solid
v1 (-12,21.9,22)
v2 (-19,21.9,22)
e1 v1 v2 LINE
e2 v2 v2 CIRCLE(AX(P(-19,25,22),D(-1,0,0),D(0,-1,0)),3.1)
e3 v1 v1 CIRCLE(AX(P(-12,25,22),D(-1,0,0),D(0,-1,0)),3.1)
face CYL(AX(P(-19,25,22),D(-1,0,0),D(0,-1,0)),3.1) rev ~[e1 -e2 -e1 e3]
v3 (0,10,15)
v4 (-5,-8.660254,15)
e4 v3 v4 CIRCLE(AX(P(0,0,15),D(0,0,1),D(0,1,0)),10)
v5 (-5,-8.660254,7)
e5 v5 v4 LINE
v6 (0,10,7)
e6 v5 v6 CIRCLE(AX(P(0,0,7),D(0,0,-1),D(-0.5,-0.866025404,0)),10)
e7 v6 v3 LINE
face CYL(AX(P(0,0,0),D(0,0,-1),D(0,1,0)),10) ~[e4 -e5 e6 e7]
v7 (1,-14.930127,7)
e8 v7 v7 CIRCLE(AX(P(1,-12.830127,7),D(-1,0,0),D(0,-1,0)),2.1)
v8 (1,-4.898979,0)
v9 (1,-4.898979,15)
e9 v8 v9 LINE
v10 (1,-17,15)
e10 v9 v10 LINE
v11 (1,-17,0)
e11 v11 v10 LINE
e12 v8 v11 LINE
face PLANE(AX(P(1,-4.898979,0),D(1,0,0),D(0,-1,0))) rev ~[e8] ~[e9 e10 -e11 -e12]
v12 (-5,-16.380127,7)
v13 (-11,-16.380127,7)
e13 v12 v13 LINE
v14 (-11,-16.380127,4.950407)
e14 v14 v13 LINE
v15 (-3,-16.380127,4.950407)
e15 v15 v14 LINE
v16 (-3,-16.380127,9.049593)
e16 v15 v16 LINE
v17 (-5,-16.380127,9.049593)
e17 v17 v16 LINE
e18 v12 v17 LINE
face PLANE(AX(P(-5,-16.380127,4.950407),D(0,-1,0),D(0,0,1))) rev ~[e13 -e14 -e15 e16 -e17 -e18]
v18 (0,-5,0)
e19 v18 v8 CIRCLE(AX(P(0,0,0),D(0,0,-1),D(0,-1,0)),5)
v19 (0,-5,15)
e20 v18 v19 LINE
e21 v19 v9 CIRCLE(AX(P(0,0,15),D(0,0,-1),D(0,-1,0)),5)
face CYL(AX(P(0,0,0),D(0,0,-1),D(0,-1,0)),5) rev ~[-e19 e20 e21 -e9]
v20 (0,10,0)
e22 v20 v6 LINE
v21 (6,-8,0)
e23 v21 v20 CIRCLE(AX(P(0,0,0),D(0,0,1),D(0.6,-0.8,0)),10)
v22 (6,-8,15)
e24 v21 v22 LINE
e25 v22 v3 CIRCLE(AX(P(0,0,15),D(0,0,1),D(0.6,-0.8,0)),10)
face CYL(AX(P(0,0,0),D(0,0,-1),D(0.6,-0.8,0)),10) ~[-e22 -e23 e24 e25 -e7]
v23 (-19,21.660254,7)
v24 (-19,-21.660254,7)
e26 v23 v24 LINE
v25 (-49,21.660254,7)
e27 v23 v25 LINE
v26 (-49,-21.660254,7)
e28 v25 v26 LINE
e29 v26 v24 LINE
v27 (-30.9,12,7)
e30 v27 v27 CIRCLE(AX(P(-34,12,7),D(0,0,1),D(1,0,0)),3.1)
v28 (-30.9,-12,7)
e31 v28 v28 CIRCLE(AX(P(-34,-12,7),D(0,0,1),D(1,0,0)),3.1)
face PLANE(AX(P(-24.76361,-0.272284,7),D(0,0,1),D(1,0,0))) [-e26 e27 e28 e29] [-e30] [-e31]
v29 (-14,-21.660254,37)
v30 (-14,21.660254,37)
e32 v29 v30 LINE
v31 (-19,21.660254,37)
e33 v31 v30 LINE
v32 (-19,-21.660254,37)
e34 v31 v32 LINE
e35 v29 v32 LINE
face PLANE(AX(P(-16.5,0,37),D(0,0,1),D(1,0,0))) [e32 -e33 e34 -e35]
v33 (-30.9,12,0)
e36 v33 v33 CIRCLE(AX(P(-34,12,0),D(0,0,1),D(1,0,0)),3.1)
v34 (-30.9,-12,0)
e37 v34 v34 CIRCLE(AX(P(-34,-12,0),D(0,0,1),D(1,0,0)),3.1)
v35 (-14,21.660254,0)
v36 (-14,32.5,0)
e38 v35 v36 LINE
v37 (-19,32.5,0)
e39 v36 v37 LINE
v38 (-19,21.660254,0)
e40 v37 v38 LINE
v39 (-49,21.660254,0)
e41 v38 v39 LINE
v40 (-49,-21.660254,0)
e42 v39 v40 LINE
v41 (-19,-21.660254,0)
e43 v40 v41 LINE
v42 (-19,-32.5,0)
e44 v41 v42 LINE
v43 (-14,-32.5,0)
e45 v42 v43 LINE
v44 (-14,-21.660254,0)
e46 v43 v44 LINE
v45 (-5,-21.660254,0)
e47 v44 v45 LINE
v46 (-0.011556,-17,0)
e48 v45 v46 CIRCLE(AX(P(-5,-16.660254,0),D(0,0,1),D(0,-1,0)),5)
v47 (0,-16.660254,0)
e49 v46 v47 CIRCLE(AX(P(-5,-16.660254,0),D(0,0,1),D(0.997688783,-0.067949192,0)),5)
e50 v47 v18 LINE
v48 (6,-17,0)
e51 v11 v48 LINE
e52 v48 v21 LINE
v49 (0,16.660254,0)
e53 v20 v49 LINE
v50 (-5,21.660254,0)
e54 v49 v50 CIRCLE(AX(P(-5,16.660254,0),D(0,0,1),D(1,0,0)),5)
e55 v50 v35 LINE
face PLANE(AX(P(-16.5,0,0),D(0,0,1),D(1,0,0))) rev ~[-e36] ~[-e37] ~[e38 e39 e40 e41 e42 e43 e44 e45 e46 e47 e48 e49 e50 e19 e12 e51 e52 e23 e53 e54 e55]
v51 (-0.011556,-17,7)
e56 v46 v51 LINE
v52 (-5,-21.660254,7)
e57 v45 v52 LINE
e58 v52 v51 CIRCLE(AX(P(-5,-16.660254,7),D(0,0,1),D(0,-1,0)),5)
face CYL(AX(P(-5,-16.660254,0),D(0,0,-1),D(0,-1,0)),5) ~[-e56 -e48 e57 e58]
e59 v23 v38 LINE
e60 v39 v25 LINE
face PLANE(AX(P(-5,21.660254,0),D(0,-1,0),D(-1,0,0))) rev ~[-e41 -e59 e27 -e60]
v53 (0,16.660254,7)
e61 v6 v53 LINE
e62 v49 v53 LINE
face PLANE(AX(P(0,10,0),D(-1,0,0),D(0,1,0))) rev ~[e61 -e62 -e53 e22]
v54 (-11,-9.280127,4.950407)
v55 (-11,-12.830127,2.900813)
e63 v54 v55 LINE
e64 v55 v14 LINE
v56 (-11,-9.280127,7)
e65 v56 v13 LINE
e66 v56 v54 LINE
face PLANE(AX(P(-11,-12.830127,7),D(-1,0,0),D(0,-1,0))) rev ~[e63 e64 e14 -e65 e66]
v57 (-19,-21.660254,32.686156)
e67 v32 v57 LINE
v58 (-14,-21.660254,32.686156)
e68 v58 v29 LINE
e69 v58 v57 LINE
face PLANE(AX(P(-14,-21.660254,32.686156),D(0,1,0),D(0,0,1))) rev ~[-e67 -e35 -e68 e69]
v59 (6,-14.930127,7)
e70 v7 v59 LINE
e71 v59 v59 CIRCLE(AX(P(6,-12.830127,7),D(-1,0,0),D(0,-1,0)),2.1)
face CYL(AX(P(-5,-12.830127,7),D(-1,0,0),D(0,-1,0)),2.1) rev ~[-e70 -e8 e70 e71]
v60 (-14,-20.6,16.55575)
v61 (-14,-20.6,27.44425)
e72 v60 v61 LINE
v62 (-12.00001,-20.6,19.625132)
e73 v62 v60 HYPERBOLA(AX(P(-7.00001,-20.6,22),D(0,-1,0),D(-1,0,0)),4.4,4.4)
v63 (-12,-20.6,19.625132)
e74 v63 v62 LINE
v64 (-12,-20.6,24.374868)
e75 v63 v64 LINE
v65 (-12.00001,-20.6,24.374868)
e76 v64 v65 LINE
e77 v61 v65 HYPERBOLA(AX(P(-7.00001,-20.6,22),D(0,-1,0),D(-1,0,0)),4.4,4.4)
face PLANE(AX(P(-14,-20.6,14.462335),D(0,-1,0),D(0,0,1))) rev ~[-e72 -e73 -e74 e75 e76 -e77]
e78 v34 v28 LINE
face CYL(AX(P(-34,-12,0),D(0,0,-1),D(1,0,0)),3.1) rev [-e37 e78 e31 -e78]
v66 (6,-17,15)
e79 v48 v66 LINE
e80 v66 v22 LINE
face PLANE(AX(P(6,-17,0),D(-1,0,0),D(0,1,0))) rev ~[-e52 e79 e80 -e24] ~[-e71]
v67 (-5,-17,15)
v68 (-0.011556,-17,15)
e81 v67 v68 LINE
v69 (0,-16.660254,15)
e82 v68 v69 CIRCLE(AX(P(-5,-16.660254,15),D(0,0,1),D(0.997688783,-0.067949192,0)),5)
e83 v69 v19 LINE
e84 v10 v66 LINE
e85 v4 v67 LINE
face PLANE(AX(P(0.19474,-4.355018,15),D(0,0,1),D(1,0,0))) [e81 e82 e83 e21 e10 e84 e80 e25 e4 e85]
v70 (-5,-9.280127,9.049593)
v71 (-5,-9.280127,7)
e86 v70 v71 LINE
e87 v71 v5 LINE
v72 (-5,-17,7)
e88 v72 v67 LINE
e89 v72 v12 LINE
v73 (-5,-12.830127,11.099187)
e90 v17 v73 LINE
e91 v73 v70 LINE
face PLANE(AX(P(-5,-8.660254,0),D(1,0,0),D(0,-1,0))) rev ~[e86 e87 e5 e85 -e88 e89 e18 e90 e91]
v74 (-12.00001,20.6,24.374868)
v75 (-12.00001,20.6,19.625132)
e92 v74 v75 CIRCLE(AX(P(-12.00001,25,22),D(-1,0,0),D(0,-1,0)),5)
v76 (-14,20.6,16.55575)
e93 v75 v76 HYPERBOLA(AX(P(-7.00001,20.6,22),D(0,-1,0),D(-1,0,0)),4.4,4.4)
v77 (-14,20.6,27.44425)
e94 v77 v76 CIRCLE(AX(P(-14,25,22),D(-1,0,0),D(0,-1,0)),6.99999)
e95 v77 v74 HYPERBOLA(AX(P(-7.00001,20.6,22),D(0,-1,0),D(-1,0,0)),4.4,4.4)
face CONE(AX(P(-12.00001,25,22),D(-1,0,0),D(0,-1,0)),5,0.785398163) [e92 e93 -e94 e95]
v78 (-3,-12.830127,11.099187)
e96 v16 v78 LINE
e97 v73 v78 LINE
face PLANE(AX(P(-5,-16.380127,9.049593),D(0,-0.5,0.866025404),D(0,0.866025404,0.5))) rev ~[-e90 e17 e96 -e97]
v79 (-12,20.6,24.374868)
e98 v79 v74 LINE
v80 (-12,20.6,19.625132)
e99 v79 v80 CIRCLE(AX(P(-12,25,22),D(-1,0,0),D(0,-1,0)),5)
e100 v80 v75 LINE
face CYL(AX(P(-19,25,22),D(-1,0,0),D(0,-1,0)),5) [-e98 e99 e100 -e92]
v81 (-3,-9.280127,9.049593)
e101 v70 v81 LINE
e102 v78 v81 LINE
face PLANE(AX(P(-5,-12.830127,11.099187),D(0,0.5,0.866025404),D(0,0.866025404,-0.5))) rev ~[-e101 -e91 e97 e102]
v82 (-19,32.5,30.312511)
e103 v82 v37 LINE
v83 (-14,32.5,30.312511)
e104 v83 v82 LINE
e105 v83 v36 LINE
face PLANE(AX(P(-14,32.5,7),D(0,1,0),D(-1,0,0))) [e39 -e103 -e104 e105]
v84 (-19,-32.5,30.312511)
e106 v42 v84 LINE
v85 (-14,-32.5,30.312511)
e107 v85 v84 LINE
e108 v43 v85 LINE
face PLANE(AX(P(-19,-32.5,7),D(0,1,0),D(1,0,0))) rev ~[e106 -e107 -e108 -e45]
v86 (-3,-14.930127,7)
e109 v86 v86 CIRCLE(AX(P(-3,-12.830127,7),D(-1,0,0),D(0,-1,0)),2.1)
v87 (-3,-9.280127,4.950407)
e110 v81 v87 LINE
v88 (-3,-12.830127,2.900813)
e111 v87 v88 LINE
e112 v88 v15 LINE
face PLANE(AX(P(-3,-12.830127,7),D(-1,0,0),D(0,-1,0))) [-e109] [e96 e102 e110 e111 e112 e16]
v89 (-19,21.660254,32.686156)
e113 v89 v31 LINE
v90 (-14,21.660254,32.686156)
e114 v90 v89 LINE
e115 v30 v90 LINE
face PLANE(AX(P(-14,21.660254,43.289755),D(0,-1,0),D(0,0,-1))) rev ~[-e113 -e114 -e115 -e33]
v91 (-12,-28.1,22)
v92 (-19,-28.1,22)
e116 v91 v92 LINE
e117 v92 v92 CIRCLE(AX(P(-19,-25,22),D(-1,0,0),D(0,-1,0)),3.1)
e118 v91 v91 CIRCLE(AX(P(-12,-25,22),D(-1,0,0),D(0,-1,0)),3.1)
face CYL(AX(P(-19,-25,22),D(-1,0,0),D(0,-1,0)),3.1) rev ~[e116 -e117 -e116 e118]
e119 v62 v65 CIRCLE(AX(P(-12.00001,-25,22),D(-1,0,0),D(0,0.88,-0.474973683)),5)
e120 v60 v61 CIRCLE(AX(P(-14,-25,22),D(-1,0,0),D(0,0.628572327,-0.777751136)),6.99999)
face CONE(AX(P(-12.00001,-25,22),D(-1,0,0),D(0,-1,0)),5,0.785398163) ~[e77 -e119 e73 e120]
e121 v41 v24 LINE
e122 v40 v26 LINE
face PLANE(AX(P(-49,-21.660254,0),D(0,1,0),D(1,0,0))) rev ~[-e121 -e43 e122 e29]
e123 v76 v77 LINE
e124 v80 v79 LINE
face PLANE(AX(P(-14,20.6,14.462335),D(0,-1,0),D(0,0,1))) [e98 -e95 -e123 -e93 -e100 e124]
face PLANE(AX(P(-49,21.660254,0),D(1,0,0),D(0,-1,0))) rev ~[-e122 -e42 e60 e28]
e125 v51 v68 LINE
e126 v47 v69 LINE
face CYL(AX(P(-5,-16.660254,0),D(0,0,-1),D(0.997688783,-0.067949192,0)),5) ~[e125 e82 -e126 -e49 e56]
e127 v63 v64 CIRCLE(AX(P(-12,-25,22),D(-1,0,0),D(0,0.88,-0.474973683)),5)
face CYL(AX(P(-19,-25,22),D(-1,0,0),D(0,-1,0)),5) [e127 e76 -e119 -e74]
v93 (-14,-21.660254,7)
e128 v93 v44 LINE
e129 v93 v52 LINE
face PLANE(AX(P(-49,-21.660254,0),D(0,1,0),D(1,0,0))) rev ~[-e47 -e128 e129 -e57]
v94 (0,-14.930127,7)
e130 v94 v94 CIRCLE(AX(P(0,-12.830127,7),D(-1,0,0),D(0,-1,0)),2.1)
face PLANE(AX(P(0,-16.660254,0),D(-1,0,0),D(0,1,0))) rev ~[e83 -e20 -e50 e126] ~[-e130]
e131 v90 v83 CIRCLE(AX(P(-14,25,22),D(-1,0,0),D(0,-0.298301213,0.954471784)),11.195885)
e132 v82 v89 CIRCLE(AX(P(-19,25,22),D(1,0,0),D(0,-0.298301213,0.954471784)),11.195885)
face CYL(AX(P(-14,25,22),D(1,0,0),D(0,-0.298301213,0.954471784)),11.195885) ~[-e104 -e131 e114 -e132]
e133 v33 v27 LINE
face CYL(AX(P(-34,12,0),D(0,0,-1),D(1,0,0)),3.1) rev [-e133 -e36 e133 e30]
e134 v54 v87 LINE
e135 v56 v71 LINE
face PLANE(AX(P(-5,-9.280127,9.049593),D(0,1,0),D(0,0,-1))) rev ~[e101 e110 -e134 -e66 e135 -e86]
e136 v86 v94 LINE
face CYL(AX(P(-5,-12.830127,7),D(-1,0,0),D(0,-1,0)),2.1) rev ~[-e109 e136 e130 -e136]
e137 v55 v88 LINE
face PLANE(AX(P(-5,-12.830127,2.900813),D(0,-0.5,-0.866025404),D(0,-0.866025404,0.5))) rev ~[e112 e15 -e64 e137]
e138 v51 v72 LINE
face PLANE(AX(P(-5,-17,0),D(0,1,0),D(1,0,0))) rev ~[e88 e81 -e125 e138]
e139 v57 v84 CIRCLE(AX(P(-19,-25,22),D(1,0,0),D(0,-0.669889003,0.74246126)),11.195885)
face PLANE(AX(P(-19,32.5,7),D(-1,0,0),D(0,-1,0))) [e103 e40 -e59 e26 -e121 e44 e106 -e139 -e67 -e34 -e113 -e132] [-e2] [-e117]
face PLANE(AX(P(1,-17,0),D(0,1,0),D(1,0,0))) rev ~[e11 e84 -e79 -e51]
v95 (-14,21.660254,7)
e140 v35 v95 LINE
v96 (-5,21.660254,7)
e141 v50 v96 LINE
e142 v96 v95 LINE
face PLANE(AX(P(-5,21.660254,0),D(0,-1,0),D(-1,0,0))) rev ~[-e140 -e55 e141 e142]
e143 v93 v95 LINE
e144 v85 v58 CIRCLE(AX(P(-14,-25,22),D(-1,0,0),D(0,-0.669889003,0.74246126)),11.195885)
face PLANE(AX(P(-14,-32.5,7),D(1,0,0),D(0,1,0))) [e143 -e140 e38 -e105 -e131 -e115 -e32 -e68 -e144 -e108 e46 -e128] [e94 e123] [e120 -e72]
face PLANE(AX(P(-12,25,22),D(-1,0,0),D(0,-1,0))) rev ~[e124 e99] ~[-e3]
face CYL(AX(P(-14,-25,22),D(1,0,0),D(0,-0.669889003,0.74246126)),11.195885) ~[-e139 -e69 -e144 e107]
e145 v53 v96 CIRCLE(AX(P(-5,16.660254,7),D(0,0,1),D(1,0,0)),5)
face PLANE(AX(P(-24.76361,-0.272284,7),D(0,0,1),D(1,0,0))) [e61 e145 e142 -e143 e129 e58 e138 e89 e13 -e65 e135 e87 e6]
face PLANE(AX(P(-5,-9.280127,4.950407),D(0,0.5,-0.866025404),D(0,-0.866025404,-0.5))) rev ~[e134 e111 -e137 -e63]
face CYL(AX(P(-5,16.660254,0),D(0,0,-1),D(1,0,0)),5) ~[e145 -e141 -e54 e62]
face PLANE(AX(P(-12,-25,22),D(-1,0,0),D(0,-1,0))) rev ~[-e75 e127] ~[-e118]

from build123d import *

# Parameters (mm, degrees)
F0_R          = 3.1
F1_DEPTH      = 7
F2_DEPTH      = 15
F4_DEPTH      = 2
F4_DEPTH_BACK = 6
F5_R          = 2.1
F6_DEPTH      = 25
F8_DEPTH      = 30
F9_DEPTH      = 25
F9_DEPTH_BACK = 7
F10_R         = 3.1
F11_DEPTH     = 25
F12_R         = 5
F12_R_2       = 3.1
F13_DEPTH     = 7
F14_SIZE      = 1.99999
F15_W         = 3.459926136
F15_H         = 15.633740799
F16_DEPTH     = 25
F18_DEPTH     = 25


# Not quite as in the source:
# - a fillet or chamfer is up to 0.001 mm smaller than in the source, because OpenCascade refuses the exact size


with BuildPart() as f1:
    # F0 (on Top) → F1 (new body)
    with BuildSketch(Plane.XY):
        with BuildLine():
            ThreePointArc((-5, -21.6602540378), (-1.5866973333, -20.3139323085), (-0.0115560862, -17))
            Line((-0.0115560862, -17), (-5, -17))
            Line((-5, -17), (-5, -8.6602540378))
            ThreePointArc((-5, -8.6602540378), (-9.6592582629, 2.588190451), (0, 10))
            Line((0, 10), (0, 16.6602540378))
            ThreePointArc((0, 16.6602540378), (-1.4644660941, 20.1957879438), (-5, 21.6602540378))
            Line((-5, 21.6602540378), (-49, 21.6602540378))
            Line((-49, 21.6602540378), (-49, 0))
            Line((-49, 0), (-49, -21.6602540378))
            Line((-49, -21.6602540378), (-5, -21.6602540378))
        make_face()
        with Locations((-34, -12)):
            Circle(F0_R, mode=Mode.SUBTRACT)
        with Locations((-34, 12)):
            Circle(F0_R, mode=Mode.SUBTRACT)
    extrude(amount=F1_DEPTH)

    # F0 (on Top) → F2 (join)
    with BuildSketch(Plane.XY):
        with BuildLine():
            ThreePointArc((0, -5), (-0.50254481, 4.974680765), (1, -4.8989794856))
            Line((1, -4.8989794856), (1, -9.9498743711))
            Line((1, -9.9498743711), (1, -17))
            Line((1, -17), (6, -17))
            Line((6, -17), (6, -8))
            ThreePointArc((6, -8), (9.4868329805, 3.1622776602), (0, 10))
            ThreePointArc((0, 10), (-9.6592582629, 2.588190451), (-5, -8.6602540378))
            Line((-5, -8.6602540378), (-5, -17))
            Line((-5, -17), (-0.0115560862, -17))
            ThreePointArc((-0.0115560862, -17), (-0.0028898567, -16.8302252574), (0, -16.6602540378))
            Line((0, -16.6602540378), (0, -10))
            Line((0, -10), (0, -5))
        make_face()
    extrude(amount=F2_DEPTH)

    # F3 (on face) → F4 (cut, two sides)
    with BuildSketch(Plane(origin=(-5, 0, 0), x_dir=(0, -1, 0), z_dir=(-1, 0, 0))) as f4_sk:
        Polygon((16.3801270189, 4.9504065444), (16.3801270189, 9.0495934556), (12.8301270189, 11.0991869112), (9.2801270189, 9.0495934556), (9.2801270189, 4.9504065444), (12.8301270189, 2.9008130888), align=None)
    extrude(amount=-F4_DEPTH, mode=Mode.SUBTRACT)
    extrude(f4_sk.sketch, amount=F4_DEPTH_BACK, mode=Mode.SUBTRACT)

    # F5 (on face) → F6 (cut)
    with BuildSketch(Plane(origin=(-5, 0, 0), x_dir=(0, -1, 0), z_dir=(-1, 0, 0))):
        with Locations((12.8301270189, 7)):
            Circle(F5_R)
    extrude(amount=-F6_DEPTH, mode=Mode.SUBTRACT)

    # F7 (on face) → F8 (join)
    with BuildSketch(Plane.XY.offset(7)):
        Polygon((-19, 32.5), (-19, 21.6602540378), (-19, -21.6602540378), (-19, -32.5), (-14, -32.5), (-14, -21.6602540378), (-14, 21.6602540378), (-14, 32.5), align=None)
    extrude(amount=F8_DEPTH)

    # F7 (on face) → F9 (join, two sides)
    with BuildSketch(Plane.XY.offset(7)) as f9_sk:
        Polygon((-19, 32.5), (-19, 21.6602540378), (-19, -21.6602540378), (-19, -32.5), (-14, -32.5), (-14, -21.6602540378), (-14, 21.6602540378), (-14, 32.5), align=None)
    extrude(amount=F9_DEPTH)
    extrude(f9_sk.sketch, amount=-F9_DEPTH_BACK)

    # F10 (on face) → F11 (cut)
    with BuildSketch(Plane(origin=(-19, 0, 0), x_dir=(0, -1, 0), z_dir=(-1, 0, 0))):
        with Locations((-25, 22)):
            Circle(F10_R)
        with Locations((25, 22)):
            Circle(F10_R)
    extrude(amount=-F11_DEPTH, mode=Mode.SUBTRACT)

    # F12 (on face) → F13 (join)
    with BuildSketch(Plane(origin=(-19, 0, 0), x_dir=(0, -1, 0), z_dir=(-1, 0, 0))):
        with Locations((25, 22)):
            Circle(F12_R)
        with Locations((25, 22)):
            Circle(F12_R_2, mode=Mode.SUBTRACT)
        with Locations((-25, 22)):
            Circle(F12_R)
        with Locations((-25, 22)):
            Circle(F12_R_2, mode=Mode.SUBTRACT)
    extrude(amount=-F13_DEPTH)

    # F14 (size 2 in the source; OpenCascade refuses exactly that, so slightly less here)
    f14_edges = [f1.edges().sort_by_distance(p)[0] for p in [
        (-14, 30, 22),
        (-14, -20, 22),
    ]]
    chamfer(f14_edges, length=F14_SIZE)

    # F15 (on face) → F16 (cut)
    with BuildSketch(Plane.YZ.offset(-14)):
        with Locations((18.870036932, 22.279205732)):
            Rectangle(F15_W, F15_H)
        with Locations((-18.870036932, 22.279205732)):
            Rectangle(F15_W, F15_H)
    extrude(amount=F16_DEPTH, mode=Mode.SUBTRACT)

    # F17 (on face) → F18 (cut)
    with BuildSketch(Plane.YZ.offset(-14)):
        with BuildLine():
            Line((21.6602540378, 43.2897545397), (21.6602540378, 32.6861559824))
            ThreePointArc((21.6602540378, 32.6861559824), (27.3948854866, 32.9367434036), (32.5, 30.3125106178))
            Line((32.5, 30.3125106178), (32.5, 43.2897545397))
            Line((32.5, 43.2897545397), (21.6602540378, 43.2897545397))
        make_face()
        with BuildLine():
            ThreePointArc((-32.5, 30.3125106178), (-27.3948854866, 32.9367434036), (-21.6602540378, 32.6861559824))
            Line((-21.6602540378, 32.6861559824), (-21.6602540378, 43.2897545397))
            Line((-21.6602540378, 43.2897545397), (-32.5, 43.2897545397))
            Line((-32.5, 43.2897545397), (-32.5, 30.3125106178))
        make_face()
    extrude(amount=-F18_DEPTH, mode=Mode.SUBTRACT)


solid = f1.part
